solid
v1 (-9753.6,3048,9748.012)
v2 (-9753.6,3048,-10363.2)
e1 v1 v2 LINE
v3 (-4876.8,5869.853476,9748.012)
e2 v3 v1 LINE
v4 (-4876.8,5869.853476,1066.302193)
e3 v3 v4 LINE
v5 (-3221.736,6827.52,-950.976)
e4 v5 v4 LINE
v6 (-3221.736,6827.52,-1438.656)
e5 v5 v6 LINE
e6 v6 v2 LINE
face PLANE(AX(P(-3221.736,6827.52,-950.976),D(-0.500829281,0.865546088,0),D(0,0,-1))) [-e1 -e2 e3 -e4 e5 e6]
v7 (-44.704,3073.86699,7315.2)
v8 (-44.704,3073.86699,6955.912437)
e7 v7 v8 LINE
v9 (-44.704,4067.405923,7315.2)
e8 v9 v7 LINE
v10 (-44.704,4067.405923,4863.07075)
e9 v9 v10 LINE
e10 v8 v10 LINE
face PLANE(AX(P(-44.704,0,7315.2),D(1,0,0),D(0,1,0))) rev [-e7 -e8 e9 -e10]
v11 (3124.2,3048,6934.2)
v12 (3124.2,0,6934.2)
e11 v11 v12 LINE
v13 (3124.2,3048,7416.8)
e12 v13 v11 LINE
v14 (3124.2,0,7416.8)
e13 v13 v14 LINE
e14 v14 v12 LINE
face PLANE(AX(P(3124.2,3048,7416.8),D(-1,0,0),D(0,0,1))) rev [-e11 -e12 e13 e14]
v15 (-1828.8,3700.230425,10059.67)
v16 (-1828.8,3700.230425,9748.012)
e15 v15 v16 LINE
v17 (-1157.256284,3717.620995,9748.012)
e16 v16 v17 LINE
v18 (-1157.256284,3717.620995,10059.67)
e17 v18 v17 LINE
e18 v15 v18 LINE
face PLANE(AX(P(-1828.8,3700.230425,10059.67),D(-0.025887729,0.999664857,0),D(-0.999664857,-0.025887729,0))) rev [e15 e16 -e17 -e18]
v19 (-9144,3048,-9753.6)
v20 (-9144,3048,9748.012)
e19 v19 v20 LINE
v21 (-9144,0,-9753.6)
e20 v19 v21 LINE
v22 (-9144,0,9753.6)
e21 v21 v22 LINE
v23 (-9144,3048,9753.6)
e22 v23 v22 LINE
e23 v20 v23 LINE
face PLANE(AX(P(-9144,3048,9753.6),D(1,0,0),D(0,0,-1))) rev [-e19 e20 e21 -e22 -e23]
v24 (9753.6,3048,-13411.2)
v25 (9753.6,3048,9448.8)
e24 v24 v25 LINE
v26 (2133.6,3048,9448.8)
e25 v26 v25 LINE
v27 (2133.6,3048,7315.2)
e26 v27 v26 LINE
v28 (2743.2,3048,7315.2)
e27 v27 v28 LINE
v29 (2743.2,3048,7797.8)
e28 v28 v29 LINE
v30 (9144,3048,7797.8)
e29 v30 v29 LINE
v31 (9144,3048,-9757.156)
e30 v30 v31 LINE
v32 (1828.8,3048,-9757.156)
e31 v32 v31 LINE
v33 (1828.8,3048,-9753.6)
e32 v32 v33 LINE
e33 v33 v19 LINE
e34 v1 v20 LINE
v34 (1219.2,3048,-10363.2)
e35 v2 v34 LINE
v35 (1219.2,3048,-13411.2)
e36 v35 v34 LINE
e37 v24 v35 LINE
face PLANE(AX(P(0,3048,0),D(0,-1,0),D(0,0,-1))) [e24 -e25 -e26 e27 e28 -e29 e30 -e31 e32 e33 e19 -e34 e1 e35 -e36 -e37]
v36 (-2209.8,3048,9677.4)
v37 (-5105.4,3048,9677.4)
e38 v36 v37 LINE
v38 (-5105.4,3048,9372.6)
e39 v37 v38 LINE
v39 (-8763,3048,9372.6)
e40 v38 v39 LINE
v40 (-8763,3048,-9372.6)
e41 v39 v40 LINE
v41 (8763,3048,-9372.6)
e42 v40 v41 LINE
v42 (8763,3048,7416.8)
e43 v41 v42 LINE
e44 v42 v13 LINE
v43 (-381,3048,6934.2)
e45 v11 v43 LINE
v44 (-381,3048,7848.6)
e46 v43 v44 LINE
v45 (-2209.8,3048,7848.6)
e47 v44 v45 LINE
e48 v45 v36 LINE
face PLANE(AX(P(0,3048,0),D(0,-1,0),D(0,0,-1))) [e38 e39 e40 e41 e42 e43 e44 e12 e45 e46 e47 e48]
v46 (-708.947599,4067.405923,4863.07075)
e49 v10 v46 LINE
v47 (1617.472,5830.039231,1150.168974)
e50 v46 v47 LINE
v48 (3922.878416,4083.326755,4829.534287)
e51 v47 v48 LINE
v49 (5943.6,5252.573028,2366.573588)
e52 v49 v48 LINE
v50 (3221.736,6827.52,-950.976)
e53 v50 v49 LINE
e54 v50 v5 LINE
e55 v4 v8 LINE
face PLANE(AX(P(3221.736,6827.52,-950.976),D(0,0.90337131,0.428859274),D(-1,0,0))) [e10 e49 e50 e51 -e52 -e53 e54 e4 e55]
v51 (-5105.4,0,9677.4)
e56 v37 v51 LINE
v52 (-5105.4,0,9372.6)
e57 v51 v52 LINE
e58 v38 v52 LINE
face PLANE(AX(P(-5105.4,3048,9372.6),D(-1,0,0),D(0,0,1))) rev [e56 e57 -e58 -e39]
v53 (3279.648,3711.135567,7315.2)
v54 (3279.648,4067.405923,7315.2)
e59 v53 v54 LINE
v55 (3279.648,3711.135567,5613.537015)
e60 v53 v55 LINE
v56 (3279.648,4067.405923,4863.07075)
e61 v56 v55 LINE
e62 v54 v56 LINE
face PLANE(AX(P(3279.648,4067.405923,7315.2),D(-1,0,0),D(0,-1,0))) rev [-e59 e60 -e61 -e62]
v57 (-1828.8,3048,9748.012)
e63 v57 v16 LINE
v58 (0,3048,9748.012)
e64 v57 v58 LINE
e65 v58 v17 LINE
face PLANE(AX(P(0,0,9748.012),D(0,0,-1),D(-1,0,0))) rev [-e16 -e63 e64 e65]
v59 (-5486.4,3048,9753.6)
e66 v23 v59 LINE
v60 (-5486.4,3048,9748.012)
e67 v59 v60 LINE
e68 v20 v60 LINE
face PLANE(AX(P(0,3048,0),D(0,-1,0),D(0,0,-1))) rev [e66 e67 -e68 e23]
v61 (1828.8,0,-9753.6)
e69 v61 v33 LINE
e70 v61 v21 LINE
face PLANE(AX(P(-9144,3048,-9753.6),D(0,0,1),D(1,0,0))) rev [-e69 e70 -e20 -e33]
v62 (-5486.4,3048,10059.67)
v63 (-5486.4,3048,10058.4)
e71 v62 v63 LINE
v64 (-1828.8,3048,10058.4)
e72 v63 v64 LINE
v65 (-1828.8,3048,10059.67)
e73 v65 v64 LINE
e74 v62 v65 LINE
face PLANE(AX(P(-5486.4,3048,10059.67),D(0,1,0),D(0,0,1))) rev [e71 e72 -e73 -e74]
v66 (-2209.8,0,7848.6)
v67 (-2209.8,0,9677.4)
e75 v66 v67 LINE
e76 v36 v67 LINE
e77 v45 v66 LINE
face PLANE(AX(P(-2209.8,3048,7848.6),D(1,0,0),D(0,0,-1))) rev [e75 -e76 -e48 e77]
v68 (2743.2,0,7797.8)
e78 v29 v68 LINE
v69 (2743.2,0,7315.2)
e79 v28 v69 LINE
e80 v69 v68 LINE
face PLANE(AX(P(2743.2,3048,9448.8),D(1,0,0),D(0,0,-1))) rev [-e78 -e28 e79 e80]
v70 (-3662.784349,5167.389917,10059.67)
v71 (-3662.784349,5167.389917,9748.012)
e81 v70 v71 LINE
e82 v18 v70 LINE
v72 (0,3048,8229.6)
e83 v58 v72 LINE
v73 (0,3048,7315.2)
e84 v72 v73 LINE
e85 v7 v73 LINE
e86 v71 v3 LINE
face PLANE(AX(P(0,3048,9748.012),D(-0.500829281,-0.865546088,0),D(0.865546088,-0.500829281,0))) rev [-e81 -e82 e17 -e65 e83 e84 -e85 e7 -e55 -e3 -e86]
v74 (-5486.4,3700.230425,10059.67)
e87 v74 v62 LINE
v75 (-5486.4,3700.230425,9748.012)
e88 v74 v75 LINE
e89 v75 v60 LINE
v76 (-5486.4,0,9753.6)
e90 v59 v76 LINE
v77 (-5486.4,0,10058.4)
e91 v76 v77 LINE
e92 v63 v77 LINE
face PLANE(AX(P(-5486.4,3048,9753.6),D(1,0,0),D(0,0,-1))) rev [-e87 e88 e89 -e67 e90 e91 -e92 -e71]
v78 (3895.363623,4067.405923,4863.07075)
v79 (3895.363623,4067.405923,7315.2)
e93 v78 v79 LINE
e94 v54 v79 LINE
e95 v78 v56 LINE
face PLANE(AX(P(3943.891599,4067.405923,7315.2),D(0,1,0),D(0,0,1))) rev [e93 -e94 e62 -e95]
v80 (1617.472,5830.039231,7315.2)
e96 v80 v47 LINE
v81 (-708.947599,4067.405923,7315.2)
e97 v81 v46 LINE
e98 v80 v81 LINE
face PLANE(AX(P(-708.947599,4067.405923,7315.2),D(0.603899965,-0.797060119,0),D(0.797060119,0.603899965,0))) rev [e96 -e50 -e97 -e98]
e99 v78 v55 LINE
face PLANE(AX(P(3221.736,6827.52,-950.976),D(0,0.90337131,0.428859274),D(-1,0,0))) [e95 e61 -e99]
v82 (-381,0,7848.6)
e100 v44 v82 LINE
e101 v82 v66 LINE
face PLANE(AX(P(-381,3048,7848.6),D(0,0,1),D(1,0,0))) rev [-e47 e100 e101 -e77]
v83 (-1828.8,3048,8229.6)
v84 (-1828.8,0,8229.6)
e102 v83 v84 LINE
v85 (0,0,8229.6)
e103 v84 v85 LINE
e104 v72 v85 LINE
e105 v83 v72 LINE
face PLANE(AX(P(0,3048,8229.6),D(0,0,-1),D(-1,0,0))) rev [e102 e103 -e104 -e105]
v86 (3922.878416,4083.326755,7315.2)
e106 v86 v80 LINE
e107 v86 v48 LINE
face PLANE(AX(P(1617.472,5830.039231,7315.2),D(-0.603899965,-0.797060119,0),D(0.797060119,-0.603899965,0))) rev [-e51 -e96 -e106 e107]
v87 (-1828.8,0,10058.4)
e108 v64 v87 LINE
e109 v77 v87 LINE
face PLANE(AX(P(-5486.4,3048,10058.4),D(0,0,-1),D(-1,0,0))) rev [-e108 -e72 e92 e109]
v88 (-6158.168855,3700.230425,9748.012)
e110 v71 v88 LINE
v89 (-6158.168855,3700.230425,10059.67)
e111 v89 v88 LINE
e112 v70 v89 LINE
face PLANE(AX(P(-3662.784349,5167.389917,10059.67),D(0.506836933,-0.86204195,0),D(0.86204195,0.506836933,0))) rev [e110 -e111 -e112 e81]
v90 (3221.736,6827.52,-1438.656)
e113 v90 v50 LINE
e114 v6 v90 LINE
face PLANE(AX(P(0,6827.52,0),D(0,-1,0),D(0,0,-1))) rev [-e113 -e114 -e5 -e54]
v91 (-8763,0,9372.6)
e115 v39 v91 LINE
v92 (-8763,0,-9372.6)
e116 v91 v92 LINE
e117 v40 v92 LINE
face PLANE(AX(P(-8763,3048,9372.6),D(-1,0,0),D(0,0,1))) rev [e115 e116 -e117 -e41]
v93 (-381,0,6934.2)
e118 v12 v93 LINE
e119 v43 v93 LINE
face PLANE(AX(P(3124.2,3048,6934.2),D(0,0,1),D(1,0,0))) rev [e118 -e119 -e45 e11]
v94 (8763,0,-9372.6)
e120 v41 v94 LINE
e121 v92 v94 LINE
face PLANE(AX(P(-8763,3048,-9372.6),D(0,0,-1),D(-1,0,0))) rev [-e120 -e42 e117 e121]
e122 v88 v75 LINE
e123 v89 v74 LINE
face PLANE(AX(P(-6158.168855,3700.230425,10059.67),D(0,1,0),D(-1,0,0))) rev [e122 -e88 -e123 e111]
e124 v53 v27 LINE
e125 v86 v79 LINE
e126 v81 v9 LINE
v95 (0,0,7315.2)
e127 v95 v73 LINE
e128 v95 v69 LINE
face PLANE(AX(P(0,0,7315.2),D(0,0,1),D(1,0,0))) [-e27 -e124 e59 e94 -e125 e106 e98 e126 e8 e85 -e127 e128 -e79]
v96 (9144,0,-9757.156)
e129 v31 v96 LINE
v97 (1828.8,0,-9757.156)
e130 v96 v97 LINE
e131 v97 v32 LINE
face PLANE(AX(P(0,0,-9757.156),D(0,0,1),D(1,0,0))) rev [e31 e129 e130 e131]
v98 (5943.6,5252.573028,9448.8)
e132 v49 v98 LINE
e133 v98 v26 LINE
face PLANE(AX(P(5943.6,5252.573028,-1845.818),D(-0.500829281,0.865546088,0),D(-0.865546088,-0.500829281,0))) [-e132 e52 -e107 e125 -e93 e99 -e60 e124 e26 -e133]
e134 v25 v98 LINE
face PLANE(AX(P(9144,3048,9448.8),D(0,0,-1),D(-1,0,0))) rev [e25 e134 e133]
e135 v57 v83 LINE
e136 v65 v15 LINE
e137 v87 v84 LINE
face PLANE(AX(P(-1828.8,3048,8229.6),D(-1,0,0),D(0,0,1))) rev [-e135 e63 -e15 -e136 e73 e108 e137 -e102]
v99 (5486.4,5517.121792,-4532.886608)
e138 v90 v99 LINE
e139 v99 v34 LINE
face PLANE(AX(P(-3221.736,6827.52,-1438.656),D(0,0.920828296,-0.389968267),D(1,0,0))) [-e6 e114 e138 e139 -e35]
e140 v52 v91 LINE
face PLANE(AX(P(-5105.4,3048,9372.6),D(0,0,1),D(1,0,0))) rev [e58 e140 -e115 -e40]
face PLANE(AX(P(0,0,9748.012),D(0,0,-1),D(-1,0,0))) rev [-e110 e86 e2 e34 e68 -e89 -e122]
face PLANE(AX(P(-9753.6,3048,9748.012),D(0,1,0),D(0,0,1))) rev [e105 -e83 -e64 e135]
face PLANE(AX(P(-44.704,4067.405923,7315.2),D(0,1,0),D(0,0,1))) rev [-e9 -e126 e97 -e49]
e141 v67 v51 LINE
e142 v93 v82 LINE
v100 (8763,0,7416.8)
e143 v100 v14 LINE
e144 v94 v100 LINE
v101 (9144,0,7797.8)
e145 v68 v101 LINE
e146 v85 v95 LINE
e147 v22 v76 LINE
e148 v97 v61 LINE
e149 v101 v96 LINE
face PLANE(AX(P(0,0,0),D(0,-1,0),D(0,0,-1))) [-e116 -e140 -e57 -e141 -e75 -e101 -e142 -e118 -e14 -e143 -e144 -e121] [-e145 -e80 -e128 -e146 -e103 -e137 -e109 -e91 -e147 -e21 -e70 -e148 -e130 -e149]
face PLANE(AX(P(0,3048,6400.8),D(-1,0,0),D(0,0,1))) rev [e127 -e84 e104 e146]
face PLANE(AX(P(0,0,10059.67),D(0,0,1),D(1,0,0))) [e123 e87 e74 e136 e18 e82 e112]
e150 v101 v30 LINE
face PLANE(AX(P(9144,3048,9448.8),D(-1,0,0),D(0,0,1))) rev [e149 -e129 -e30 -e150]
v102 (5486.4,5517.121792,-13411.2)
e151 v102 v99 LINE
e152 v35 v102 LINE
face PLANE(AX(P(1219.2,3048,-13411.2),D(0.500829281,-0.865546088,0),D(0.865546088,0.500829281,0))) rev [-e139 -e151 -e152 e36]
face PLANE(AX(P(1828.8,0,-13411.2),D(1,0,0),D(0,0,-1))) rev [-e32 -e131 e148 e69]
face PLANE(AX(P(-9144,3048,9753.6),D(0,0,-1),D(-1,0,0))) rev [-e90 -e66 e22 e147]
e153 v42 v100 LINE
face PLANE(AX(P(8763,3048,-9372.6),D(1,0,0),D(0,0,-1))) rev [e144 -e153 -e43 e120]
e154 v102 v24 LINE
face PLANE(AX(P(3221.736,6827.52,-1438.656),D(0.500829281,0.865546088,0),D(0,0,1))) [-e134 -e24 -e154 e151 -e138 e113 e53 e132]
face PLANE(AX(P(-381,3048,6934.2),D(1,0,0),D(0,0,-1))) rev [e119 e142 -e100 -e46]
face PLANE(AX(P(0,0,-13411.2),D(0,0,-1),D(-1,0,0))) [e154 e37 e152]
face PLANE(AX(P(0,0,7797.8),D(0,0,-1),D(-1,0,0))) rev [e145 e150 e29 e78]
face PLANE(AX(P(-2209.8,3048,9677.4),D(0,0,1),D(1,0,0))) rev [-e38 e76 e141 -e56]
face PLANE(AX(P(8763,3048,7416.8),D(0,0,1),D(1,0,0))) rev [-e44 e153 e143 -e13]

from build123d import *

# Parameters (mm, degrees)
BOSS_EXTRUDE1_DEPTH = 3048
BOSS_EXTRUDE2_START = -5486.4
BOSS_EXTRUDE2_DEPTH = 9144
BOSS_EXTRUDE4_DEPTH = 7315.2
BOSS_EXTRUDE5_DEPTH = 11294.618
BOSS_EXTRUDE6_DEPTH = 812.8
BOSS_EXTRUDE7_DEPTH = 9748.012
BOSS_EXTRUDE8_DEPTH = 311.658
SKETCH15_W          = 7315.2
SKETCH15_H          = 3048
CUT_EXTRUDE1_DEPTH  = 3654.044
SKETCH16_W          = 6400.8
SKETCH16_H          = 3048
CUT_EXTRUDE2_DEPTH  = 1651
CUT_EXTRUDE3_DEPTH  = 3048


with BuildPart() as part:
    # Sketch1 → Boss-Extrude1 (new body)
    with BuildSketch(Plane(origin=(0, 0, 0), x_dir=(1, 0, 0), z_dir=(0, 1, 0))):
        Polygon((9144, -9448.8), (2743.2, -9448.8), (2743.2, -6400.8), (0, -6400.8), (0, -8229.6), (-1828.8, -8229.6), (-1828.8, -9753.6), (-1828.8, -10058.4), (-5486.4, -10058.4), (-5486.4, -9753.6), (-9144, -9753.6), (-9144, 9753.6), (9144, 9753.6), align=None)
    extrude(amount=BOSS_EXTRUDE1_DEPTH)

    # Boundary7: read off the stored shape, not the designer's step
    # Boundary7: loft between two sections, ruled curve by curve
    boundary7_from = [
        Edge.make_line((-3221.736, 6827.52, -1438.656), (3221.736, 6827.52, -1438.656)),
        Edge.make_line((3221.736, 6827.52, -1438.656), (3221.736, 6827.52, -950.976)),
        Edge.make_line((-3221.736, 6827.52, -950.976), (-3221.736, 6827.52, -1438.656)),
        Edge.make_line((-3221.736, 6827.52, -950.976), (3221.736, 6827.52, -950.976)),
    ]
    boundary7_to = [
        Edge.make_line((-9753.6, 3048, -10363.2), (9753.6, 3048, -10363.2)),
        Edge.make_line((9753.6, 3048, -10363.2), (9753.6, 3048, 7010.4)),
        Edge.make_line((-9753.6, 3048, 7010.4), (-9753.6, 3048, -10363.2)),
        Edge.make_line((-9753.6, 3048, 7010.4), (9753.6, 3048, 7010.4)),
    ]
    boundary7 = Solid(Shell([*[Face.make_surface_from_curves(boundary7_from[k], boundary7_to[k]) for k in range(4)], Face(Wire(boundary7_from)), Face(Wire(boundary7_to))]))
    add(boundary7)

    # Sketch5 → Boss-Extrude2 (add)
    with BuildSketch(Plane(origin=(0, 0, -9753.6), x_dir=(-1, 0, 0), z_dir=(0, 0, -1)).offset(BOSS_EXTRUDE2_START)):
        Polygon((-9144, 0), (-1828.8, 0), (-1828.8, 3048), (-1219.2, 3048), (-5486.4, 5517.121791881), (-9753.6, 3048), (-9144, 3048), align=None)
    extrude(amount=BOSS_EXTRUDE2_DEPTH)

    # Sketch9 → Boss-Extrude4 (add)
    with BuildSketch(Plane.XY):
        Polygon((3279.648, 0), (-44.704, 0), (-44.704, 4067.405922576), (-708.94759912, 4067.405922576), (1617.472, 5830.039231191), (3943.89159912, 4067.405922576), (3279.648, 4067.405922576), align=None)
    extrude(amount=BOSS_EXTRUDE4_DEPTH)

    # Sketch7 → Boss-Extrude5 (add)
    with BuildSketch(Plane.XY.offset(9448.8)):
        Polygon((2743.2, 0), (9144, 0), (9144, 3048), (9753.6, 3048), (5943.6, 5252.573028465), (2133.6, 3048), (2743.2, 3048), align=None)
    extrude(amount=-BOSS_EXTRUDE5_DEPTH)

    # Sketch11 → Boss-Extrude6 (add)
    with BuildSketch(Plane.XY):
        Polygon((-9753.6, 3048), (46.156697944, 3048), (-4853.721651028, 5883.207257454), align=None)
    extrude(amount=BOSS_EXTRUDE6_DEPTH)

    # Sketch12 → Boss-Extrude7 (add)
    with BuildSketch(Plane.XY):
        Polygon((-9753.6, 3048), (0, 3048), (-4876.8, 5869.853476435), align=None)
    extrude(amount=BOSS_EXTRUDE7_DEPTH)

    # Sketch13 → Boss-Extrude8 (add)
    with BuildSketch(Plane.XY.offset(9748.012)):
        Polygon((-1828.8, 3048), (-1828.8, 3700.230424559), (-1157.256283504, 3717.620994655), (-3662.784348589, 5167.389917055), (-6158.168855406, 3700.230424559), (-5486.4, 3700.230424559), (-5486.4, 3048), align=None)
    extrude(amount=BOSS_EXTRUDE8_DEPTH)

    # Sketch15 → Cut-Extrude1 (cut)
    with BuildSketch(Plane(origin=(0, 0, -13411.2), x_dir=(-1, 0, 0), z_dir=(0, 0, -1))):
        with Locations((-5486.4, 1524)):
            Rectangle(SKETCH15_W, SKETCH15_H)
    extrude(amount=-CUT_EXTRUDE1_DEPTH, mode=Mode.SUBTRACT)

    # Sketch16 → Cut-Extrude2 (cut)
    with BuildSketch(Plane.XY.offset(9448.8)):
        with Locations((5943.6, 1524)):
            Rectangle(SKETCH16_W, SKETCH16_H)
    extrude(amount=-CUT_EXTRUDE2_DEPTH, mode=Mode.SUBTRACT)

    # Sketch17 → Cut-Extrude3 (cut)
    with BuildSketch(Plane.XZ):
        Polygon((-8763, 9372.6), (-8763, -9372.6), (8763, -9372.6), (8763, 7416.8), (3124.2, 7416.8), (3124.2, 6934.2), (-381, 6934.2), (-381, 7848.6), (-2209.8, 7848.6), (-2209.8, 9677.4), (-5105.4, 9677.4), (-5105.4, 9372.6), align=None)
    extrude(amount=-CUT_EXTRUDE3_DEPTH, mode=Mode.SUBTRACT)


solid = part.part
